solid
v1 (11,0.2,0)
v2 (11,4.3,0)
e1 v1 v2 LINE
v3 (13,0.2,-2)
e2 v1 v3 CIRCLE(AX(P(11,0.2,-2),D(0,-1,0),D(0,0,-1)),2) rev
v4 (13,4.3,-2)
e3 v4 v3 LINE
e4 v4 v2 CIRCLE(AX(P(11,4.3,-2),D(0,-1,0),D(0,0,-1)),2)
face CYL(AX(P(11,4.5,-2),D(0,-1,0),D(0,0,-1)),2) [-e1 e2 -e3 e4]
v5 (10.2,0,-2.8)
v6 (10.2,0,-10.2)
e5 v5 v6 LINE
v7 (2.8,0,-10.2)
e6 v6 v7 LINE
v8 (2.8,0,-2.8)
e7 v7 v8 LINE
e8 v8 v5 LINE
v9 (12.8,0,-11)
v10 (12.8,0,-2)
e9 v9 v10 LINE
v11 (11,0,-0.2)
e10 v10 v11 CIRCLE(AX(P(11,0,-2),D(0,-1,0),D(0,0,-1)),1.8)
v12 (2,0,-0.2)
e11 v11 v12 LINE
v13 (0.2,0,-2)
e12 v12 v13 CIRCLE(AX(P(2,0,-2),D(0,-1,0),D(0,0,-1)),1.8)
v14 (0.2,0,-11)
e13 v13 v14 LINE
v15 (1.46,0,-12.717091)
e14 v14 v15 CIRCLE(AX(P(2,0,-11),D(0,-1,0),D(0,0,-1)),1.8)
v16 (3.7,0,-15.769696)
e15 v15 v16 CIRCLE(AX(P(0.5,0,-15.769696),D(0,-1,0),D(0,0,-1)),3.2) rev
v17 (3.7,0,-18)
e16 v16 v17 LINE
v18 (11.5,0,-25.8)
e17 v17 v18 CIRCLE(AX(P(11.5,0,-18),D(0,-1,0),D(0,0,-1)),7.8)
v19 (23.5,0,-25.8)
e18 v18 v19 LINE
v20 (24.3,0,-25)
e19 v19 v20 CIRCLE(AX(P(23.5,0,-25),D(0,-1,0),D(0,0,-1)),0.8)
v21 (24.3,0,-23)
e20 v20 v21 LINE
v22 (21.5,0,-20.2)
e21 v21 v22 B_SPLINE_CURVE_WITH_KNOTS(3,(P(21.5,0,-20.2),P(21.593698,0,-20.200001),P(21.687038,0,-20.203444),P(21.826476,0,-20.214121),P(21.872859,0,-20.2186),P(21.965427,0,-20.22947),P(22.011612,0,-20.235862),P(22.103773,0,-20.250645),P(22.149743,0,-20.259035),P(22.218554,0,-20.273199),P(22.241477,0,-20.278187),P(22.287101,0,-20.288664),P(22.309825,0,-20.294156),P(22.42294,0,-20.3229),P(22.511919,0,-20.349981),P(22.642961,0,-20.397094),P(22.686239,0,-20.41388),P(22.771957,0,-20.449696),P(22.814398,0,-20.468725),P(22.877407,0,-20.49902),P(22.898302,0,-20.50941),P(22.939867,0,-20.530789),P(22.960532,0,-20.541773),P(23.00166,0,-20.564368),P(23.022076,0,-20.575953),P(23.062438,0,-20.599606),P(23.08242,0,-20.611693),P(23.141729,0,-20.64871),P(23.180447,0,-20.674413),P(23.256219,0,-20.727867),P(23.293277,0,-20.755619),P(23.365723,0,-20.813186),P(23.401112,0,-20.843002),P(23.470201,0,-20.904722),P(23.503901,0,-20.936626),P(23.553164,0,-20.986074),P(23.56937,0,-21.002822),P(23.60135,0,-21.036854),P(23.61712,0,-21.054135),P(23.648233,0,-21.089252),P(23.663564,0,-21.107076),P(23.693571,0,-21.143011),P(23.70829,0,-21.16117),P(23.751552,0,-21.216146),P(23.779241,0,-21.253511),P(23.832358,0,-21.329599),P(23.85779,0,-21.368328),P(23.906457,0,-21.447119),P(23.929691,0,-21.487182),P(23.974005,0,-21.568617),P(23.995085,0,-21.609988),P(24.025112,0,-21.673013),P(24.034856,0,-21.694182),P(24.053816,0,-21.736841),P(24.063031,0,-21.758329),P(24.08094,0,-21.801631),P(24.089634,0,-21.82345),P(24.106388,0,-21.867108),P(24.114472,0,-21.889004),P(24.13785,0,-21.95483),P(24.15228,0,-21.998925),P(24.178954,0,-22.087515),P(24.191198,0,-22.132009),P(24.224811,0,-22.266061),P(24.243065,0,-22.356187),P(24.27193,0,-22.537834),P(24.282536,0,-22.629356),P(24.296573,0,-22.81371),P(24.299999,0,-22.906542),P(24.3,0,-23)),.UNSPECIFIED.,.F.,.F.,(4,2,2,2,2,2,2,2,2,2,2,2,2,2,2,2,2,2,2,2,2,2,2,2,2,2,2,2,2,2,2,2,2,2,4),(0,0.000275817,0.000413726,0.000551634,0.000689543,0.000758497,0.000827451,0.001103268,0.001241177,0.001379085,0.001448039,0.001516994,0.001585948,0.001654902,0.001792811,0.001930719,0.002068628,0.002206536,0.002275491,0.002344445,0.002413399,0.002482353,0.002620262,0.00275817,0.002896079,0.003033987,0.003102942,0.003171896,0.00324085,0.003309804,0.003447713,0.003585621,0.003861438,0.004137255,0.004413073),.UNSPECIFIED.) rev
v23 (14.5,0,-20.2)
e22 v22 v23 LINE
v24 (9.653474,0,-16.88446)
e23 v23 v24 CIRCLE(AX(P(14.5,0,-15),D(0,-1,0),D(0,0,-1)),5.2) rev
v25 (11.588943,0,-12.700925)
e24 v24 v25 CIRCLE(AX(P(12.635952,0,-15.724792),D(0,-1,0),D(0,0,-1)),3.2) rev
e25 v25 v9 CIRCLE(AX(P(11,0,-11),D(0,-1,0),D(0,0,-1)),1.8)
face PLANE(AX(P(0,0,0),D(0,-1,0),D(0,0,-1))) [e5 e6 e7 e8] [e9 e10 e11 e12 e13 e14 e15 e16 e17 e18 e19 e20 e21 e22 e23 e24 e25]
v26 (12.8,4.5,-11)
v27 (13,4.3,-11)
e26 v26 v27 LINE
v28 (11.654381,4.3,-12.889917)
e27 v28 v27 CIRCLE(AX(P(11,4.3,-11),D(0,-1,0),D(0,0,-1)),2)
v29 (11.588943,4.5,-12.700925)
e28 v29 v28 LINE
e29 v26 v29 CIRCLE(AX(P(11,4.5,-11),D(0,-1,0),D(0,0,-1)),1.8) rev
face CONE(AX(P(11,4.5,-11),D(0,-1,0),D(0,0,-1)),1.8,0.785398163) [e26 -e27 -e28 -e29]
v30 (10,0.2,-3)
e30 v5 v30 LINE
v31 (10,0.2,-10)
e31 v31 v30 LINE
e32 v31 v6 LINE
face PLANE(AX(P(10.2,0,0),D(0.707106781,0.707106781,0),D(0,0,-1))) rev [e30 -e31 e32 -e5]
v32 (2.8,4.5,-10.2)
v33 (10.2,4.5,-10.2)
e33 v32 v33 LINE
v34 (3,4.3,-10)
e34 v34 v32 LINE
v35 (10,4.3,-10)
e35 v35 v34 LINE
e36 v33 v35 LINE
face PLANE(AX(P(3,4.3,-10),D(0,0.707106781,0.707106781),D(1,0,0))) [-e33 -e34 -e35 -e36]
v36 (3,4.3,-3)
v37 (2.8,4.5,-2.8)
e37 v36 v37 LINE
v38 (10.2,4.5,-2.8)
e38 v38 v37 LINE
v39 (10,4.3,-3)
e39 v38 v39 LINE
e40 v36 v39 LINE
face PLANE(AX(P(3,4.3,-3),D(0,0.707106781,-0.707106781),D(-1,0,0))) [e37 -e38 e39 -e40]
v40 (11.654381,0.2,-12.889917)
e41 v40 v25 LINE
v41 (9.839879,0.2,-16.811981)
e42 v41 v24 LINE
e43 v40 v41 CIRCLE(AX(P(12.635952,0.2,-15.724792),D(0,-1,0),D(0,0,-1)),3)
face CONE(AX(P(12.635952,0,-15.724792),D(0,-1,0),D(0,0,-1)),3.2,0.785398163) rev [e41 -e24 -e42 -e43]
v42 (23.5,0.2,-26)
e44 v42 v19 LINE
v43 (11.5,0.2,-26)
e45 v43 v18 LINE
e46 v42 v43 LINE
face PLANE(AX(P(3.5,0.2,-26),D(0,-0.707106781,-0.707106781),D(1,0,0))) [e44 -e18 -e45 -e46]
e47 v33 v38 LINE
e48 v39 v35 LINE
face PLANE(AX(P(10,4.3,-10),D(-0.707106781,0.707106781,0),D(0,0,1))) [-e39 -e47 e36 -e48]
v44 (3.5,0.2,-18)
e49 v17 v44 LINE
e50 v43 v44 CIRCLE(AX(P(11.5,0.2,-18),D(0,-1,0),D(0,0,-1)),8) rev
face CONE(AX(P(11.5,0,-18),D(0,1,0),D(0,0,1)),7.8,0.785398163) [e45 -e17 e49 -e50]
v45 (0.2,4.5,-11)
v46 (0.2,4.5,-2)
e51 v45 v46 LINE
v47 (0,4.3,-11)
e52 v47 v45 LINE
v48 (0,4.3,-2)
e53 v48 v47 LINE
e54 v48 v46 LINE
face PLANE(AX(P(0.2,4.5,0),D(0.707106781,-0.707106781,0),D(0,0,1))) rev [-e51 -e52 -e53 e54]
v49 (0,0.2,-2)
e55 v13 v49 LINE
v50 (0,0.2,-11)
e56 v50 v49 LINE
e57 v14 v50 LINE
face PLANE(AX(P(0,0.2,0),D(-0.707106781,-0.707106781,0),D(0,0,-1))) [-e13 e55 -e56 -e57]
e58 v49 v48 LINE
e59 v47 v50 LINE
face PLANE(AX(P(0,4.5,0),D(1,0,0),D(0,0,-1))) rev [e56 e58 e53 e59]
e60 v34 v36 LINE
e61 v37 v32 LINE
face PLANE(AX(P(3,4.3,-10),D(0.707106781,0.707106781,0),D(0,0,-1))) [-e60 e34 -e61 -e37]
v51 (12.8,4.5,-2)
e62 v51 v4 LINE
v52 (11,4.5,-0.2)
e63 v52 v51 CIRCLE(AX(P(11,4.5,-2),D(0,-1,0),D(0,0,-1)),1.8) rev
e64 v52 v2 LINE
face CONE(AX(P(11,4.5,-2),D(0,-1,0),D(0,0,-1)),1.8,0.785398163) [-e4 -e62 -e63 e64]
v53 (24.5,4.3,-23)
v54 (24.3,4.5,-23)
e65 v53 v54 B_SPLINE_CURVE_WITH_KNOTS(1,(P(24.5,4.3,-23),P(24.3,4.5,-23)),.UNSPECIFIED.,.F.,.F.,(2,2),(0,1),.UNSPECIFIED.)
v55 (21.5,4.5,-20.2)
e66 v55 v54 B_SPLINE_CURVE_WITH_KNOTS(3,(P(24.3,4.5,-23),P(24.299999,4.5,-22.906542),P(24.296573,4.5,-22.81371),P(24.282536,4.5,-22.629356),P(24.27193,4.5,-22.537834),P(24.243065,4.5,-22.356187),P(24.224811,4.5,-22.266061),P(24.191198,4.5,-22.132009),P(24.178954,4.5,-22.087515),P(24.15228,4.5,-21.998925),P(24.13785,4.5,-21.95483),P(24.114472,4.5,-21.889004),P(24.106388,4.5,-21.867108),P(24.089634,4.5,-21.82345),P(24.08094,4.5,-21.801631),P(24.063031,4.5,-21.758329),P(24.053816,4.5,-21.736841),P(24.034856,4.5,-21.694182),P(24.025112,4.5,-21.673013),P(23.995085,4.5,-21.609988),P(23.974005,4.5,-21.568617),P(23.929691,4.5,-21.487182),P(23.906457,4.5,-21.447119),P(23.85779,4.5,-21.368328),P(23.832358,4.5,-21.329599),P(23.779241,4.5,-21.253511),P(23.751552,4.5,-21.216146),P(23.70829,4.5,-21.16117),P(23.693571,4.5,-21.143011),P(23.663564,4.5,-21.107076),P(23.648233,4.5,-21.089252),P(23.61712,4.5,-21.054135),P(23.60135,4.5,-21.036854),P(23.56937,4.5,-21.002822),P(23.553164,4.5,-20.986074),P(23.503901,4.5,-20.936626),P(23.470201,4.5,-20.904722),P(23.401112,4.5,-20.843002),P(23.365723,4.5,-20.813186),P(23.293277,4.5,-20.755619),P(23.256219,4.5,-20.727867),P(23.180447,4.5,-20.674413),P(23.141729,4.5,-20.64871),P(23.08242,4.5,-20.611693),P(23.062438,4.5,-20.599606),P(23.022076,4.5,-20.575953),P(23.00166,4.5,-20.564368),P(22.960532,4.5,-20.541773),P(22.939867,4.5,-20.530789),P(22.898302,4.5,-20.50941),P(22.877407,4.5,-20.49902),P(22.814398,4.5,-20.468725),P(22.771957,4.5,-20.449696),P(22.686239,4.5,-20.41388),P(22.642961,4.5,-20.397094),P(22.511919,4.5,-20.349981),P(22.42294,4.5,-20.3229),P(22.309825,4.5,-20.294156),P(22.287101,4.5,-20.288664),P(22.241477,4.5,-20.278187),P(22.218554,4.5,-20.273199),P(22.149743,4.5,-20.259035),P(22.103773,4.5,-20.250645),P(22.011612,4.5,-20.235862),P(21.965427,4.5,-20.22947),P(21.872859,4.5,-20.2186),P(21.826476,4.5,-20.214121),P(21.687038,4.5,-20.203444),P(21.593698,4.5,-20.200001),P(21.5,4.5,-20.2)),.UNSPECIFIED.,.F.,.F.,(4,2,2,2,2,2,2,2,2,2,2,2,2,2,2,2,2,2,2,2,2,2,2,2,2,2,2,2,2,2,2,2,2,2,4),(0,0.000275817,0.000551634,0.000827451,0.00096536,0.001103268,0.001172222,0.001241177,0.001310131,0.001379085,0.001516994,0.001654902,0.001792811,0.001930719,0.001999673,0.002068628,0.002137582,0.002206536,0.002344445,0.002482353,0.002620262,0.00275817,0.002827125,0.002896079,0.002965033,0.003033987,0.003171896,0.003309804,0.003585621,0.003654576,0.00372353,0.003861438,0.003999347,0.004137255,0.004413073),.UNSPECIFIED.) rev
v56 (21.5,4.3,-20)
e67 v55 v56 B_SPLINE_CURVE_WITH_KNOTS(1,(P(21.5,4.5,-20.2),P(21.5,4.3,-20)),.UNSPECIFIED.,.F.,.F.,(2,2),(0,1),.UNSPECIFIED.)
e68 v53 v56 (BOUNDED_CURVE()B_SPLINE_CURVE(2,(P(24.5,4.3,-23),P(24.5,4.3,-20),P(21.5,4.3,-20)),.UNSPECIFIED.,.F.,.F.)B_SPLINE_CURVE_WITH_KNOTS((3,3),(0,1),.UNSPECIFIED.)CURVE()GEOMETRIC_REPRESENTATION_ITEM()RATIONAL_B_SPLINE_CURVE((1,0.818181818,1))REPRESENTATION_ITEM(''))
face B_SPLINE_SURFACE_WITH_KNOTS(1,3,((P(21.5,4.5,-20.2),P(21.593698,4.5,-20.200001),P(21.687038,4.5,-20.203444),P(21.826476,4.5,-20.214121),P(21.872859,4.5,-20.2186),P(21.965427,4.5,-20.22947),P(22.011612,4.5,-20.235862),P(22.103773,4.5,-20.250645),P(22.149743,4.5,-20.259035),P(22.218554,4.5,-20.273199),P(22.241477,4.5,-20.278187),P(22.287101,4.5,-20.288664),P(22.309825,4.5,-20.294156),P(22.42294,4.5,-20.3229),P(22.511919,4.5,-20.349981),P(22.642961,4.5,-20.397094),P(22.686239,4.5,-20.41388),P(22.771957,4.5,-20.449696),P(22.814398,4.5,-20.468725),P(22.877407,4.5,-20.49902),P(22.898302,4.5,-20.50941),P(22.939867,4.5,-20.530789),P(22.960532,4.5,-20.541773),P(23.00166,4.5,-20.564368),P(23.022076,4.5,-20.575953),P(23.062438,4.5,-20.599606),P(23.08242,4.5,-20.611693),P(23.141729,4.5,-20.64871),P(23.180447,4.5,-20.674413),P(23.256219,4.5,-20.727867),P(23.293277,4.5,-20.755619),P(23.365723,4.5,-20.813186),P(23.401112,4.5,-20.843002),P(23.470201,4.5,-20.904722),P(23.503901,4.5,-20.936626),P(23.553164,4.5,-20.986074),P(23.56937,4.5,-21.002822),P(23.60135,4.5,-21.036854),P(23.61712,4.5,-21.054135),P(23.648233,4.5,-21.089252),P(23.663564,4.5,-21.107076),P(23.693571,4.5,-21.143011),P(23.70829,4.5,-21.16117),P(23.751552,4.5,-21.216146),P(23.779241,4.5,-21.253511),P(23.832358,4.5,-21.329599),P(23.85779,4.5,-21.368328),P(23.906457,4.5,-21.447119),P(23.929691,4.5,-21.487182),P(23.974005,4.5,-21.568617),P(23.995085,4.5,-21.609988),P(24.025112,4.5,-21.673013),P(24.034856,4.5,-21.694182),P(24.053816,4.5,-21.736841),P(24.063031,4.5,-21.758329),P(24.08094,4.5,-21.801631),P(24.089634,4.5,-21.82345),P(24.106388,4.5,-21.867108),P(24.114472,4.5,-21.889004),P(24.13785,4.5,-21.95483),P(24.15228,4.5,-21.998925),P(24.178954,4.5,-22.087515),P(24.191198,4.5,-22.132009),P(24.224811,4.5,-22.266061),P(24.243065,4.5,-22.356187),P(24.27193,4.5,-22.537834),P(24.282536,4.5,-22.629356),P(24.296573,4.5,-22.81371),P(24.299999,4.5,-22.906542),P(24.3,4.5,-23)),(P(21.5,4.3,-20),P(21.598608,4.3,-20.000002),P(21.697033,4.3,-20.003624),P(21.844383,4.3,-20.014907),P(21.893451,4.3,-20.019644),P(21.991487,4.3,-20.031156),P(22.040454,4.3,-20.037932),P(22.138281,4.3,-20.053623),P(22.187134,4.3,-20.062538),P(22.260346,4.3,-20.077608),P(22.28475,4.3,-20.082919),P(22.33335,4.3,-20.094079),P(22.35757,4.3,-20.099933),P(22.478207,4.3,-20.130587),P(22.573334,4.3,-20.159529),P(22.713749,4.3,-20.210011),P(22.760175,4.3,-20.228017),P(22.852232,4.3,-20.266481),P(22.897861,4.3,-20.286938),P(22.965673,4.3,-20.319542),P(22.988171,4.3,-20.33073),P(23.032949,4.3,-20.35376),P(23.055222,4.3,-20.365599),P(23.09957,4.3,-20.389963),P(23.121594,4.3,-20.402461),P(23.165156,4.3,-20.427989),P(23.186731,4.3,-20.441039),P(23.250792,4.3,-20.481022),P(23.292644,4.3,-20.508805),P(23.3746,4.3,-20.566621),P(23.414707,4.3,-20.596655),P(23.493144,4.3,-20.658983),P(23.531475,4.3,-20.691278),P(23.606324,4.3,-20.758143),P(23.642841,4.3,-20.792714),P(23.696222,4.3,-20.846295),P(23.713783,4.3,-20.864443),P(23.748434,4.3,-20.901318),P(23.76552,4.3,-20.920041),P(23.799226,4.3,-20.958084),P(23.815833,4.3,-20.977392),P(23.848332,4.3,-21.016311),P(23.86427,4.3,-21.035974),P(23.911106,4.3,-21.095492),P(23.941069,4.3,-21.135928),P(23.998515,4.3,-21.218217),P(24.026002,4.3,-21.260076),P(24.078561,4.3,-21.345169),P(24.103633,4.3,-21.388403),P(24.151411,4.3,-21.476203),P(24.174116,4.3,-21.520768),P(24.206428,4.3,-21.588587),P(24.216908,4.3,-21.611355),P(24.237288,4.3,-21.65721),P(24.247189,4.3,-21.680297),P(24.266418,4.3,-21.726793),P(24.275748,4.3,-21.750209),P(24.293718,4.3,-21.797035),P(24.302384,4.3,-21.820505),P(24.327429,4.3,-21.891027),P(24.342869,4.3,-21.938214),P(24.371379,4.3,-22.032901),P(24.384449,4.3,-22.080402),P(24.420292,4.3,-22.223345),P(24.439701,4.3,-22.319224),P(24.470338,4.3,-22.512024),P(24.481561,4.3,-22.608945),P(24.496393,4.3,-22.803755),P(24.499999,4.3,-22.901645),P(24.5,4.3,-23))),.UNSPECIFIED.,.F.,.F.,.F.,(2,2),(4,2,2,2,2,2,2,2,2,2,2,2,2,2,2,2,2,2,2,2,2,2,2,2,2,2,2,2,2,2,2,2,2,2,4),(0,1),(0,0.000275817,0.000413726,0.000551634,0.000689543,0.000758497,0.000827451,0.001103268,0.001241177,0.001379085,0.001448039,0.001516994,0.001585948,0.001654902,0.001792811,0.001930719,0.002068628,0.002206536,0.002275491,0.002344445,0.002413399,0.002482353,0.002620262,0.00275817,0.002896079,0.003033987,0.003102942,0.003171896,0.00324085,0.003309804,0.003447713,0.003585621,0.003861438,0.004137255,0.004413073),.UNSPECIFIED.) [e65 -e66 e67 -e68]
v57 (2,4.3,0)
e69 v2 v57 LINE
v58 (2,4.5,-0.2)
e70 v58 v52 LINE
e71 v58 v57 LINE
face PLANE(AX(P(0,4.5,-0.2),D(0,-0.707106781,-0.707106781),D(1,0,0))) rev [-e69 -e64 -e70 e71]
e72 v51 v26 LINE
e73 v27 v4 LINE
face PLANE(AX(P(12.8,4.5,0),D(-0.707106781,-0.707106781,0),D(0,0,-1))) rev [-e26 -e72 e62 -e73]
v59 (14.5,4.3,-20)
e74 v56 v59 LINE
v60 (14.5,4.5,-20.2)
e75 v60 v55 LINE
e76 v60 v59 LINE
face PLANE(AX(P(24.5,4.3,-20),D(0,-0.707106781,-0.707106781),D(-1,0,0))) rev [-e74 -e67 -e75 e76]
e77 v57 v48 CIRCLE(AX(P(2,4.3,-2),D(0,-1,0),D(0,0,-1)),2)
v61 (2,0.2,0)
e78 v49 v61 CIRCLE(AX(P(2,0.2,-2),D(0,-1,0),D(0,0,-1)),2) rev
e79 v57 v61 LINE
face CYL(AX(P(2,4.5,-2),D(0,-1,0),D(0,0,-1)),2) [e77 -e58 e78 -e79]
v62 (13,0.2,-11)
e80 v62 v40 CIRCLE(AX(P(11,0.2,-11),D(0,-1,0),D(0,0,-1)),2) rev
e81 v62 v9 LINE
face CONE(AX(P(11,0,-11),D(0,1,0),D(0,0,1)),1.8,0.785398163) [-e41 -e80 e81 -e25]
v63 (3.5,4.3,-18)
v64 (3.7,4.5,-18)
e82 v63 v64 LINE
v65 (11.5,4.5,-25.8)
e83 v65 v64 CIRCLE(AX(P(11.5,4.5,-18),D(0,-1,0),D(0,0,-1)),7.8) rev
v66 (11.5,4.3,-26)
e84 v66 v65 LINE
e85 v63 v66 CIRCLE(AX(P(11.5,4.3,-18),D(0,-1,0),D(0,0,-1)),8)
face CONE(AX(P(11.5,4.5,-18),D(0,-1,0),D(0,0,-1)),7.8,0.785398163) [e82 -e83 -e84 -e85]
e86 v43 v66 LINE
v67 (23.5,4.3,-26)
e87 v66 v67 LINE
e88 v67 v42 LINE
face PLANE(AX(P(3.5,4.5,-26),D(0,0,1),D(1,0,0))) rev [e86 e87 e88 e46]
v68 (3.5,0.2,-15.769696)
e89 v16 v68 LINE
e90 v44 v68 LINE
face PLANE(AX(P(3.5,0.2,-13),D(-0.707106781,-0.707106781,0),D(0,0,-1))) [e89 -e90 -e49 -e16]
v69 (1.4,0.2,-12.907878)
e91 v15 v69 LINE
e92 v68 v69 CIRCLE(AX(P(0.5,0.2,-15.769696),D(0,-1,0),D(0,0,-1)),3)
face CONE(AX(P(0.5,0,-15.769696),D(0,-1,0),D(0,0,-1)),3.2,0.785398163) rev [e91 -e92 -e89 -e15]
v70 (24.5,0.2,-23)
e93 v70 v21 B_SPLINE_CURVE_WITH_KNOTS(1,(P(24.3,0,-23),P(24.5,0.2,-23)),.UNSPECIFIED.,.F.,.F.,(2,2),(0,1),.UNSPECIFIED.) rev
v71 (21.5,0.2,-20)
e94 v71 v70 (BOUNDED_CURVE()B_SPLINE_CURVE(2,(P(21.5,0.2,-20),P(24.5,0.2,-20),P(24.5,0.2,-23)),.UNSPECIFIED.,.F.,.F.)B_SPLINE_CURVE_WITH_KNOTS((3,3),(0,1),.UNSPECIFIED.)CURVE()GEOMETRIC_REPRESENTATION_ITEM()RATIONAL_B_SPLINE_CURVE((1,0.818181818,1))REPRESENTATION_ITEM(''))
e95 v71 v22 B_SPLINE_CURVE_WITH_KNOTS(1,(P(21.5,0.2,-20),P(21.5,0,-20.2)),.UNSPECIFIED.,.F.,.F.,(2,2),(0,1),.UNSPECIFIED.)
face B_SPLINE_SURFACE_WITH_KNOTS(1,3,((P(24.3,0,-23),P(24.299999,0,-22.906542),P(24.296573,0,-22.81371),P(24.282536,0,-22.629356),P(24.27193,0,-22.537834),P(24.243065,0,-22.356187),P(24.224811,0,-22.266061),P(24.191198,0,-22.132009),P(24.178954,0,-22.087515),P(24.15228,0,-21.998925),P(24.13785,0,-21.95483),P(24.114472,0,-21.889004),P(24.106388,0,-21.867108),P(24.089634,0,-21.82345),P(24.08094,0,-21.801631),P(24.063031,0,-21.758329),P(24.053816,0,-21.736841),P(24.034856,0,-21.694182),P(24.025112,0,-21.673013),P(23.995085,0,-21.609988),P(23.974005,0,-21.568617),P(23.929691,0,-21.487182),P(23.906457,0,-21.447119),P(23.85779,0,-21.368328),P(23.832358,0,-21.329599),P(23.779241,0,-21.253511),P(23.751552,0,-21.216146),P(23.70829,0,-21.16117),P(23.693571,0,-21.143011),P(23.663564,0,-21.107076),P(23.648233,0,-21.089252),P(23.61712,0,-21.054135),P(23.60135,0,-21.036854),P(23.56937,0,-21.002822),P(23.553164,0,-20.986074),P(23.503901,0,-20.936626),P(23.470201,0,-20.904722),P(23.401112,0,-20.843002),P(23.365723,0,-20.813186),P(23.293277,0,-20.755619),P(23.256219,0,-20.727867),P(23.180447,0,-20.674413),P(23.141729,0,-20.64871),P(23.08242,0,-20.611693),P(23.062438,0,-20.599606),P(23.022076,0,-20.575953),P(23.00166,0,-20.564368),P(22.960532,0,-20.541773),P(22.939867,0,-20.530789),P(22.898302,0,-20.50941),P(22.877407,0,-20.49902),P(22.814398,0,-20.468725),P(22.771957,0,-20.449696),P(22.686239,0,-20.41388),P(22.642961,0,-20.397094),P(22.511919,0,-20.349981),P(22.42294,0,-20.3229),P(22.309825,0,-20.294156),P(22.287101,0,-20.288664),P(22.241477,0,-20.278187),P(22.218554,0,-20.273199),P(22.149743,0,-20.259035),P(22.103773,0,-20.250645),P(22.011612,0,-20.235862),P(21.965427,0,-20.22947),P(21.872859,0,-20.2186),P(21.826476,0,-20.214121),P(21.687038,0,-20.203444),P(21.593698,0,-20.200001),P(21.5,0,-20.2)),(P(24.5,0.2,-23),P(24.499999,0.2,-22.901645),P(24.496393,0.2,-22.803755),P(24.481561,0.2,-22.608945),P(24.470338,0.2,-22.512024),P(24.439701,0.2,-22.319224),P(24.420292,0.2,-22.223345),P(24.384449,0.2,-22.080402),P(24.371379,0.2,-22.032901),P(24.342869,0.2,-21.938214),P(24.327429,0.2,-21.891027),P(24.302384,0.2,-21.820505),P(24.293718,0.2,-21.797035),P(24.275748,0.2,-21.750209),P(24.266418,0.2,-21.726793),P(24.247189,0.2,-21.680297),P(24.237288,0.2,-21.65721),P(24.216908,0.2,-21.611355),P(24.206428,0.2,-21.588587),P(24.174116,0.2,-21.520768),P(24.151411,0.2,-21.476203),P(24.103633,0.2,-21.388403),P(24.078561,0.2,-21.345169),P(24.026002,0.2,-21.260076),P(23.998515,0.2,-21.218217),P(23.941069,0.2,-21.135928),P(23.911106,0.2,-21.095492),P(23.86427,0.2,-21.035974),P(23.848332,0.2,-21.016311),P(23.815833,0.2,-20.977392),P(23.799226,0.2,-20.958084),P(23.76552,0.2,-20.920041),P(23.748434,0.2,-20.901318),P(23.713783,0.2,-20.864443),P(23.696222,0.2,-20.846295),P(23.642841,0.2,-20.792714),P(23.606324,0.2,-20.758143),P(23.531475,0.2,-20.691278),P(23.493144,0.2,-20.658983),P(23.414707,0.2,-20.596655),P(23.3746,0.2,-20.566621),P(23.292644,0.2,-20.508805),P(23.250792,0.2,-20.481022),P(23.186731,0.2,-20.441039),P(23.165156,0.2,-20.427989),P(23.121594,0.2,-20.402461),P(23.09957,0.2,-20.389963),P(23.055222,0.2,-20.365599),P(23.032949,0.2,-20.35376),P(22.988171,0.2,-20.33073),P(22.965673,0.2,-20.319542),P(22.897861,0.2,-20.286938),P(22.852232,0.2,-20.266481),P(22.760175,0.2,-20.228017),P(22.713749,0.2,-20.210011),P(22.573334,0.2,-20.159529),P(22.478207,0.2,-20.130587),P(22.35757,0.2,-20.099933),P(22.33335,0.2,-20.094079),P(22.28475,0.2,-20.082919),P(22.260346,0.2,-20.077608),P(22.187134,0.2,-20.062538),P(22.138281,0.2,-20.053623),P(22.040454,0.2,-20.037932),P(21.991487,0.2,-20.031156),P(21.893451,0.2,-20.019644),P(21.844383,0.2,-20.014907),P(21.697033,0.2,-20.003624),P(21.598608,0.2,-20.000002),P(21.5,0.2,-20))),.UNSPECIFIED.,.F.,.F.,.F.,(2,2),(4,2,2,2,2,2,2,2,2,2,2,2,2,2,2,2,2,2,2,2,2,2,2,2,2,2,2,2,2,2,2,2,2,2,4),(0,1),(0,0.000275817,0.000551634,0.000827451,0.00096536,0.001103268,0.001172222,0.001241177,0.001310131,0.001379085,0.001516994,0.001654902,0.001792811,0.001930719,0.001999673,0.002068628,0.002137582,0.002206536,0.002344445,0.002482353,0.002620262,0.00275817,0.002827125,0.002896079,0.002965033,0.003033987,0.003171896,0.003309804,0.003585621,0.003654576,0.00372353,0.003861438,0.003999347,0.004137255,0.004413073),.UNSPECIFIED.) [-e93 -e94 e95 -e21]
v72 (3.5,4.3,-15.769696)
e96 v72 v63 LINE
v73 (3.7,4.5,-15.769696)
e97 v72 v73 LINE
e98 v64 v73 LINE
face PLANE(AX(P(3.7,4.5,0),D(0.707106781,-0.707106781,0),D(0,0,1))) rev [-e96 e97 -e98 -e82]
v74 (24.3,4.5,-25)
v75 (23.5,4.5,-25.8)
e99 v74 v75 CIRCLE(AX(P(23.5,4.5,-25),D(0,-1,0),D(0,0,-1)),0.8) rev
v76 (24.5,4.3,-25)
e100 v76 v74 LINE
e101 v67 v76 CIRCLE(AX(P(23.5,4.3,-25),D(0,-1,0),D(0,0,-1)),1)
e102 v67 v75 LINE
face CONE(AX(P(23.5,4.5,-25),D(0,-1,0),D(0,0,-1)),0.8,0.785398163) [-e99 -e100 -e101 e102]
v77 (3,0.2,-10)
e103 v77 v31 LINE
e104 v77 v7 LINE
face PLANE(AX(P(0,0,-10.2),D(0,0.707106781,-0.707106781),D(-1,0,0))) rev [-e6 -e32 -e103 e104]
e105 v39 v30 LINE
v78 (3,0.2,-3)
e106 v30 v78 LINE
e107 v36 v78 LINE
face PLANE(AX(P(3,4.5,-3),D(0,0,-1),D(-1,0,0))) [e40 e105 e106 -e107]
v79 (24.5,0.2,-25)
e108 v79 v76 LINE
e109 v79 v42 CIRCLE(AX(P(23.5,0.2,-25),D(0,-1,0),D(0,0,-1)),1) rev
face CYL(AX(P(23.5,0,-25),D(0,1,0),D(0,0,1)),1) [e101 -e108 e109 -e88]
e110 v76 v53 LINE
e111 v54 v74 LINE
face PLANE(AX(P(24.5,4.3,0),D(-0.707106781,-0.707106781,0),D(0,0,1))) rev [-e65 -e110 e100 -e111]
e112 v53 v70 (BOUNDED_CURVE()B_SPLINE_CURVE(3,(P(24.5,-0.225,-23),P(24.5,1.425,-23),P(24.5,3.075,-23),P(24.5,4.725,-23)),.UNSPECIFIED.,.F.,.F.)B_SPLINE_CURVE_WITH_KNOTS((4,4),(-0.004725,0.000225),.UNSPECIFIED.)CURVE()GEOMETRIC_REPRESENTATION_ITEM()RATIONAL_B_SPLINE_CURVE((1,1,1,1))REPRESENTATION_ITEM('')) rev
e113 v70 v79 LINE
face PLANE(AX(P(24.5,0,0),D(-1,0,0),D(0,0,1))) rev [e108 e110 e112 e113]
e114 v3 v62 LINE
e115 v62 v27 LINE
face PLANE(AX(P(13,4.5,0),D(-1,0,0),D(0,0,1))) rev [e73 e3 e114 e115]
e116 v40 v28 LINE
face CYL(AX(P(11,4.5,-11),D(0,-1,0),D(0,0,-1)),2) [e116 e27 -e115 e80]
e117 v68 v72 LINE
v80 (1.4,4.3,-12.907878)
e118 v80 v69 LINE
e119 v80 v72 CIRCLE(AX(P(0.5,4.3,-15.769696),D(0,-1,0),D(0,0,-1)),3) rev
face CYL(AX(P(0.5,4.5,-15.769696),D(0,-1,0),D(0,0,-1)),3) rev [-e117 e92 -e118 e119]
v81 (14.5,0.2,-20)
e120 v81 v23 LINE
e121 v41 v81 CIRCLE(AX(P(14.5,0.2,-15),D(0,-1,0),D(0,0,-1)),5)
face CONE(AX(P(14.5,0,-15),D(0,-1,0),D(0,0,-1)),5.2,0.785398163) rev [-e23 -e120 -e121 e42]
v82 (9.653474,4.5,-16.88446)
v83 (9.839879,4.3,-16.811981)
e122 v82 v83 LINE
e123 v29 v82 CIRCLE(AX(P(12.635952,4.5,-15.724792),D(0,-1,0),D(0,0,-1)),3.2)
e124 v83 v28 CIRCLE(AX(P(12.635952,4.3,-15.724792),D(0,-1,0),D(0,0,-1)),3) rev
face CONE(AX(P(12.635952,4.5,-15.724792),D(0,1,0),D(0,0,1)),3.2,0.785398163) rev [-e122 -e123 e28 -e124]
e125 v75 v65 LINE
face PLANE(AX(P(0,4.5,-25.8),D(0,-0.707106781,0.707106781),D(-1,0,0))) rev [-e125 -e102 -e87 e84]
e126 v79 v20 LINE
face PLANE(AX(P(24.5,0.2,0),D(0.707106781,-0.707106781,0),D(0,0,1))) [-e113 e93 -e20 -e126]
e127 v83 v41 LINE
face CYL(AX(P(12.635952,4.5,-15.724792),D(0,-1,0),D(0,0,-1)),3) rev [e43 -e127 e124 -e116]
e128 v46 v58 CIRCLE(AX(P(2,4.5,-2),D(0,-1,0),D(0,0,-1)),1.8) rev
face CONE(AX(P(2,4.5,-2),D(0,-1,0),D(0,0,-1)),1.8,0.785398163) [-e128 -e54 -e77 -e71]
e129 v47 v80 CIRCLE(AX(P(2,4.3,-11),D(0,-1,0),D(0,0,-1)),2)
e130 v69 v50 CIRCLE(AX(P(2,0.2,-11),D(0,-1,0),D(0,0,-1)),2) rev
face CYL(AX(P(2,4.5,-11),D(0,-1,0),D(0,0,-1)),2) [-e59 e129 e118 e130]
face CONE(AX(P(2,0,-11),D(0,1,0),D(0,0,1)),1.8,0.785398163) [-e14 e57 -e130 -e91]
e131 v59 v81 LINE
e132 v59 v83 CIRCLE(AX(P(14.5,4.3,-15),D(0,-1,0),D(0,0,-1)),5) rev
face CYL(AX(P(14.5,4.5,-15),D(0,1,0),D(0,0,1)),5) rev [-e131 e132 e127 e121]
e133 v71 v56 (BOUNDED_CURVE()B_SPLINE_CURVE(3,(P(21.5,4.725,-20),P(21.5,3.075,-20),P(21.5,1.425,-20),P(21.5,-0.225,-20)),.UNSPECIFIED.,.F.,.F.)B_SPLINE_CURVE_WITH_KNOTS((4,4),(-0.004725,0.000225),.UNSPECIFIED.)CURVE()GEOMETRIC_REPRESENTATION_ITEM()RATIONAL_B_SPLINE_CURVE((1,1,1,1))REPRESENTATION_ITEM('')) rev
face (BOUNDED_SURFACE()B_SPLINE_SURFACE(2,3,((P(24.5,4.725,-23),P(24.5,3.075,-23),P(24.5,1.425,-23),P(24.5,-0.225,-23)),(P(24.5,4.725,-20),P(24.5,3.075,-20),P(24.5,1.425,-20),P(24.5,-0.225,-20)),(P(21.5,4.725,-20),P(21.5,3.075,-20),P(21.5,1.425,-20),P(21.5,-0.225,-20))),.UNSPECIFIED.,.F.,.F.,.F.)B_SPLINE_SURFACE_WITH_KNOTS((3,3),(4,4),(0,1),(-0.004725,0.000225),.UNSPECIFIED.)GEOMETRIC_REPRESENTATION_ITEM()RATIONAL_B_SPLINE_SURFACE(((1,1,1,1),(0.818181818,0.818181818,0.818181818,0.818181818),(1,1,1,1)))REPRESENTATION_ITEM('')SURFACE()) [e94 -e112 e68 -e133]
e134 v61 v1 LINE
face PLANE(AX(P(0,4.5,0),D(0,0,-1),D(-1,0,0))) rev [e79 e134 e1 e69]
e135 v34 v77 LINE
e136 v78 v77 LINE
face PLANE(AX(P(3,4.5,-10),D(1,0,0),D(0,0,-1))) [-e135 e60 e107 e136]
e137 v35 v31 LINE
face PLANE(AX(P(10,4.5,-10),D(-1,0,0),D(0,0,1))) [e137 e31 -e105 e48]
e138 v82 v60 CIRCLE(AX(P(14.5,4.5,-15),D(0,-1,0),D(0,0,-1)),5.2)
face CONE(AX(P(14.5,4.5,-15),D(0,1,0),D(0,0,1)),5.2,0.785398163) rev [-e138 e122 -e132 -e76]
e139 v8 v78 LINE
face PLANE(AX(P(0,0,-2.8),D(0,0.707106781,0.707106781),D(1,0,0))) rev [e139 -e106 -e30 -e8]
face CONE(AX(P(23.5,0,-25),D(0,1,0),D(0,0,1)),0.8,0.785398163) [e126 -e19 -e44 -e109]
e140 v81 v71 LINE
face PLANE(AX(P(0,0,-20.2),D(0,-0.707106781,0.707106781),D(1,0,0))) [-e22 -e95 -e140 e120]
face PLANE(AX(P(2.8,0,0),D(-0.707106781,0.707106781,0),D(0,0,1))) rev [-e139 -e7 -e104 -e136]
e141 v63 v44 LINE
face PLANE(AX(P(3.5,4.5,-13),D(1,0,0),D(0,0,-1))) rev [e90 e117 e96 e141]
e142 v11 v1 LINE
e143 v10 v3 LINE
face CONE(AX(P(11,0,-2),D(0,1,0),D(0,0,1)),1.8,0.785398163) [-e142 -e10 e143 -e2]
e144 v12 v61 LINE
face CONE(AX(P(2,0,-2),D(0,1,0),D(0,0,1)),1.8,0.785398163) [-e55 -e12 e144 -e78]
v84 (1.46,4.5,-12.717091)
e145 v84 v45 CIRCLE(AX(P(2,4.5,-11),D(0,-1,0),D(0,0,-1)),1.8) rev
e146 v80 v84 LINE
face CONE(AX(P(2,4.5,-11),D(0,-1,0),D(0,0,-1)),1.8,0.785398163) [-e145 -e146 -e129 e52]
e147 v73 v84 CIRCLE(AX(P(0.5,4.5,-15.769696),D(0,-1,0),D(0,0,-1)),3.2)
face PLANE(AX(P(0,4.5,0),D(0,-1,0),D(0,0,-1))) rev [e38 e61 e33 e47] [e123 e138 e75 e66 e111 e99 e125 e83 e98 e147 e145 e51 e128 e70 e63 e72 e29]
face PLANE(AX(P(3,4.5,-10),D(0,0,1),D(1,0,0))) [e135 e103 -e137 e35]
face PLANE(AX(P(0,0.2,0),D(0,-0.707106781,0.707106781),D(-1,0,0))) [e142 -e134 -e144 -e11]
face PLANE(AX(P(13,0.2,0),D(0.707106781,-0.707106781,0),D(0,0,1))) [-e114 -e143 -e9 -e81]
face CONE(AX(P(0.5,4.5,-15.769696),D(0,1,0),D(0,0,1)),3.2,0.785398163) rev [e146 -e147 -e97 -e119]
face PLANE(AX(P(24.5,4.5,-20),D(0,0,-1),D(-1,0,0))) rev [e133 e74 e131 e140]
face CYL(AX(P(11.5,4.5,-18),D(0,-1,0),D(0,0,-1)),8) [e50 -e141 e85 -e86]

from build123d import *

# Parameters (mm, degrees)
SKETCH_1_W      = 7
SKETCH_1_H      = 7
EXTRUDE_1_DEPTH = 4.5
SKETCH_4_W      = 6
SKETCH_4_H      = 4.5
EXTRUDE_4_DEPTH = 15
FILLET_1_SIZE   = 3
FILLET_3_R      = 5
FILLET_4_R      = 8
FILLET_5_R      = 2
FILLET_6_R      = 3
FILLET_7_R      = 1
CHAMFER_3_SIZE  = 0.2


with BuildPart() as part:
    # 草图1 → 凸台-拉伸1 (new body)
    with BuildSketch(Plane(origin=(0, 0, 0), x_dir=(1, 0, 0), z_dir=(0, 1, 0))):
        Polygon((9.5, 13), (13, 13), (13, 0), (0, 0), (0, 13), (3.5, 13), (3.5, 26), (9.5, 26), align=None)
        with Locations((6.5, 6.5)):
            Rectangle(SKETCH_1_W, SKETCH_1_H, mode=Mode.SUBTRACT)
    extrude(amount=EXTRUDE_1_DEPTH)

    # 草图4 → 凸台-拉伸4 (add)
    with BuildSketch(Plane(origin=(9.5, 0, 0), x_dir=(0, 0, -1), z_dir=(1, 0, 0))):
        with Locations((23, 2.25)):
            Rectangle(SKETCH_4_W, SKETCH_4_H)
    extrude(amount=EXTRUDE_4_DEPTH)

    # 圆角1
    # a fillet whose section is not a circle: 3 mm, written as the material it takes off along each edge
    with BuildSketch(Plane(origin=(24.5, 12, -20), x_dir=(-1, 0, 0), z_dir=(0, -1, 0))) as fillet_1_piece_1:
        with BuildLine():
            Bezier((FILLET_1_SIZE, 0), (0, 0), (0, FILLET_1_SIZE), weights=[1, 0.818181818, 1])
            Line((0, FILLET_1_SIZE), (0, 0))
            Line((0, 0), (FILLET_1_SIZE, 0))
        make_face()
    extrude(amount=19.5, mode=Mode.SUBTRACT)

    # 圆角3
    fillet_3_edges = [part.edges().sort_by_distance(p)[0] for p in [
        (9.5, 2.25, -20),
    ]]
    fillet(fillet_3_edges, radius=FILLET_3_R)

    # 圆角4
    fillet_4_edges = [part.edges().sort_by_distance(p)[0] for p in [
        (3.5, 2.25, -26),
    ]]
    fillet(fillet_4_edges, radius=FILLET_4_R)

    # 圆角5
    fillet_5_edges = [part.edges().sort_by_distance(p)[0] for p in [
        (0, 2.25, -13),
        (13, 2.25, -13),
        (13, 2.25, 0),
        (0, 2.25, 0),
    ]]
    fillet(fillet_5_edges, radius=FILLET_5_R)

    # 圆角6
    fillet_6_edges = [part.edges().sort_by_distance(p)[0] for p in [
        (9.5, 2.25, -13),
        (3.5, 2.25, -13),
    ]]
    fillet(fillet_6_edges, radius=FILLET_6_R)

    # 圆角7
    fillet_7_edges = [part.edges().sort_by_distance(p)[0] for p in [
        (24.5, 2.25, -26),
    ]]
    fillet(fillet_7_edges, radius=FILLET_7_R)

    # 倒角3
    chamfer_3_edges = [part.edges().sort_by_distance(p)[0] for p in [
        (18, 4.5, -20),
        (11.676872614, 4.5, -19.126736212),
        (11.676872614, 0, -19.126736212),
        (12.629227016, 0, -12.160008331),
        (12.629227016, 4.5, -12.160008331),
        (13, 4.5, -6.5),
        (13, 0, -6.5),
        (12.414213562, 4.5, -0.585786438),
        (12.414213562, 0, -0.585786438),
        (6.5, 0, 0),
        (6.5, 4.5, 0),
        (0.585786438, 4.5, -0.585786438),
        (0.585786438, 0, -0.585786438),
        (0, 0, -6.5),
        (0, 4.5, -6.5),
        (0.38754845, 4.5, -12.183215957),
        (0.38754845, 0, -12.183215957),
        (3.5, 0, -16.884848004),
        (3.5, 4.5, -16.884848004),
        (5.843145751, 4.5, -23.656854249),
        (5.843145751, 0, -23.656854249),
        (17.5, 4.5, -26),
        (17.5, 0, -26),
        (24.207106781, 0, -25.707106781),
        (24.207106781, 4.5, -25.707106781),
        (23.675, 4.5, -20.825),
        (23.675, 0, -20.825),
        (18, 0, -20),
        (10, 0, -6.5),
        (10, 4.5, -6.5),
        (6.5, 0, -3),
        (6.5, 4.5, -3),
        (3, 0, -6.5),
        (3, 4.5, -6.5),
        (6.5, 0, -10),
        (6.5, 4.5, -10),
        (2.918677324, 4.5, -13.994872072),
        (2.918677324, 0, -13.994872072),
        (9.913215245, 4.5, -14.465146968),
        (9.913215245, 0, -14.465146968),
        (24.5, 0, -24),
        (24.5, 4.5, -24),
    ]]
    chamfer(chamfer_3_edges, length=CHAMFER_3_SIZE)


solid = part.part
